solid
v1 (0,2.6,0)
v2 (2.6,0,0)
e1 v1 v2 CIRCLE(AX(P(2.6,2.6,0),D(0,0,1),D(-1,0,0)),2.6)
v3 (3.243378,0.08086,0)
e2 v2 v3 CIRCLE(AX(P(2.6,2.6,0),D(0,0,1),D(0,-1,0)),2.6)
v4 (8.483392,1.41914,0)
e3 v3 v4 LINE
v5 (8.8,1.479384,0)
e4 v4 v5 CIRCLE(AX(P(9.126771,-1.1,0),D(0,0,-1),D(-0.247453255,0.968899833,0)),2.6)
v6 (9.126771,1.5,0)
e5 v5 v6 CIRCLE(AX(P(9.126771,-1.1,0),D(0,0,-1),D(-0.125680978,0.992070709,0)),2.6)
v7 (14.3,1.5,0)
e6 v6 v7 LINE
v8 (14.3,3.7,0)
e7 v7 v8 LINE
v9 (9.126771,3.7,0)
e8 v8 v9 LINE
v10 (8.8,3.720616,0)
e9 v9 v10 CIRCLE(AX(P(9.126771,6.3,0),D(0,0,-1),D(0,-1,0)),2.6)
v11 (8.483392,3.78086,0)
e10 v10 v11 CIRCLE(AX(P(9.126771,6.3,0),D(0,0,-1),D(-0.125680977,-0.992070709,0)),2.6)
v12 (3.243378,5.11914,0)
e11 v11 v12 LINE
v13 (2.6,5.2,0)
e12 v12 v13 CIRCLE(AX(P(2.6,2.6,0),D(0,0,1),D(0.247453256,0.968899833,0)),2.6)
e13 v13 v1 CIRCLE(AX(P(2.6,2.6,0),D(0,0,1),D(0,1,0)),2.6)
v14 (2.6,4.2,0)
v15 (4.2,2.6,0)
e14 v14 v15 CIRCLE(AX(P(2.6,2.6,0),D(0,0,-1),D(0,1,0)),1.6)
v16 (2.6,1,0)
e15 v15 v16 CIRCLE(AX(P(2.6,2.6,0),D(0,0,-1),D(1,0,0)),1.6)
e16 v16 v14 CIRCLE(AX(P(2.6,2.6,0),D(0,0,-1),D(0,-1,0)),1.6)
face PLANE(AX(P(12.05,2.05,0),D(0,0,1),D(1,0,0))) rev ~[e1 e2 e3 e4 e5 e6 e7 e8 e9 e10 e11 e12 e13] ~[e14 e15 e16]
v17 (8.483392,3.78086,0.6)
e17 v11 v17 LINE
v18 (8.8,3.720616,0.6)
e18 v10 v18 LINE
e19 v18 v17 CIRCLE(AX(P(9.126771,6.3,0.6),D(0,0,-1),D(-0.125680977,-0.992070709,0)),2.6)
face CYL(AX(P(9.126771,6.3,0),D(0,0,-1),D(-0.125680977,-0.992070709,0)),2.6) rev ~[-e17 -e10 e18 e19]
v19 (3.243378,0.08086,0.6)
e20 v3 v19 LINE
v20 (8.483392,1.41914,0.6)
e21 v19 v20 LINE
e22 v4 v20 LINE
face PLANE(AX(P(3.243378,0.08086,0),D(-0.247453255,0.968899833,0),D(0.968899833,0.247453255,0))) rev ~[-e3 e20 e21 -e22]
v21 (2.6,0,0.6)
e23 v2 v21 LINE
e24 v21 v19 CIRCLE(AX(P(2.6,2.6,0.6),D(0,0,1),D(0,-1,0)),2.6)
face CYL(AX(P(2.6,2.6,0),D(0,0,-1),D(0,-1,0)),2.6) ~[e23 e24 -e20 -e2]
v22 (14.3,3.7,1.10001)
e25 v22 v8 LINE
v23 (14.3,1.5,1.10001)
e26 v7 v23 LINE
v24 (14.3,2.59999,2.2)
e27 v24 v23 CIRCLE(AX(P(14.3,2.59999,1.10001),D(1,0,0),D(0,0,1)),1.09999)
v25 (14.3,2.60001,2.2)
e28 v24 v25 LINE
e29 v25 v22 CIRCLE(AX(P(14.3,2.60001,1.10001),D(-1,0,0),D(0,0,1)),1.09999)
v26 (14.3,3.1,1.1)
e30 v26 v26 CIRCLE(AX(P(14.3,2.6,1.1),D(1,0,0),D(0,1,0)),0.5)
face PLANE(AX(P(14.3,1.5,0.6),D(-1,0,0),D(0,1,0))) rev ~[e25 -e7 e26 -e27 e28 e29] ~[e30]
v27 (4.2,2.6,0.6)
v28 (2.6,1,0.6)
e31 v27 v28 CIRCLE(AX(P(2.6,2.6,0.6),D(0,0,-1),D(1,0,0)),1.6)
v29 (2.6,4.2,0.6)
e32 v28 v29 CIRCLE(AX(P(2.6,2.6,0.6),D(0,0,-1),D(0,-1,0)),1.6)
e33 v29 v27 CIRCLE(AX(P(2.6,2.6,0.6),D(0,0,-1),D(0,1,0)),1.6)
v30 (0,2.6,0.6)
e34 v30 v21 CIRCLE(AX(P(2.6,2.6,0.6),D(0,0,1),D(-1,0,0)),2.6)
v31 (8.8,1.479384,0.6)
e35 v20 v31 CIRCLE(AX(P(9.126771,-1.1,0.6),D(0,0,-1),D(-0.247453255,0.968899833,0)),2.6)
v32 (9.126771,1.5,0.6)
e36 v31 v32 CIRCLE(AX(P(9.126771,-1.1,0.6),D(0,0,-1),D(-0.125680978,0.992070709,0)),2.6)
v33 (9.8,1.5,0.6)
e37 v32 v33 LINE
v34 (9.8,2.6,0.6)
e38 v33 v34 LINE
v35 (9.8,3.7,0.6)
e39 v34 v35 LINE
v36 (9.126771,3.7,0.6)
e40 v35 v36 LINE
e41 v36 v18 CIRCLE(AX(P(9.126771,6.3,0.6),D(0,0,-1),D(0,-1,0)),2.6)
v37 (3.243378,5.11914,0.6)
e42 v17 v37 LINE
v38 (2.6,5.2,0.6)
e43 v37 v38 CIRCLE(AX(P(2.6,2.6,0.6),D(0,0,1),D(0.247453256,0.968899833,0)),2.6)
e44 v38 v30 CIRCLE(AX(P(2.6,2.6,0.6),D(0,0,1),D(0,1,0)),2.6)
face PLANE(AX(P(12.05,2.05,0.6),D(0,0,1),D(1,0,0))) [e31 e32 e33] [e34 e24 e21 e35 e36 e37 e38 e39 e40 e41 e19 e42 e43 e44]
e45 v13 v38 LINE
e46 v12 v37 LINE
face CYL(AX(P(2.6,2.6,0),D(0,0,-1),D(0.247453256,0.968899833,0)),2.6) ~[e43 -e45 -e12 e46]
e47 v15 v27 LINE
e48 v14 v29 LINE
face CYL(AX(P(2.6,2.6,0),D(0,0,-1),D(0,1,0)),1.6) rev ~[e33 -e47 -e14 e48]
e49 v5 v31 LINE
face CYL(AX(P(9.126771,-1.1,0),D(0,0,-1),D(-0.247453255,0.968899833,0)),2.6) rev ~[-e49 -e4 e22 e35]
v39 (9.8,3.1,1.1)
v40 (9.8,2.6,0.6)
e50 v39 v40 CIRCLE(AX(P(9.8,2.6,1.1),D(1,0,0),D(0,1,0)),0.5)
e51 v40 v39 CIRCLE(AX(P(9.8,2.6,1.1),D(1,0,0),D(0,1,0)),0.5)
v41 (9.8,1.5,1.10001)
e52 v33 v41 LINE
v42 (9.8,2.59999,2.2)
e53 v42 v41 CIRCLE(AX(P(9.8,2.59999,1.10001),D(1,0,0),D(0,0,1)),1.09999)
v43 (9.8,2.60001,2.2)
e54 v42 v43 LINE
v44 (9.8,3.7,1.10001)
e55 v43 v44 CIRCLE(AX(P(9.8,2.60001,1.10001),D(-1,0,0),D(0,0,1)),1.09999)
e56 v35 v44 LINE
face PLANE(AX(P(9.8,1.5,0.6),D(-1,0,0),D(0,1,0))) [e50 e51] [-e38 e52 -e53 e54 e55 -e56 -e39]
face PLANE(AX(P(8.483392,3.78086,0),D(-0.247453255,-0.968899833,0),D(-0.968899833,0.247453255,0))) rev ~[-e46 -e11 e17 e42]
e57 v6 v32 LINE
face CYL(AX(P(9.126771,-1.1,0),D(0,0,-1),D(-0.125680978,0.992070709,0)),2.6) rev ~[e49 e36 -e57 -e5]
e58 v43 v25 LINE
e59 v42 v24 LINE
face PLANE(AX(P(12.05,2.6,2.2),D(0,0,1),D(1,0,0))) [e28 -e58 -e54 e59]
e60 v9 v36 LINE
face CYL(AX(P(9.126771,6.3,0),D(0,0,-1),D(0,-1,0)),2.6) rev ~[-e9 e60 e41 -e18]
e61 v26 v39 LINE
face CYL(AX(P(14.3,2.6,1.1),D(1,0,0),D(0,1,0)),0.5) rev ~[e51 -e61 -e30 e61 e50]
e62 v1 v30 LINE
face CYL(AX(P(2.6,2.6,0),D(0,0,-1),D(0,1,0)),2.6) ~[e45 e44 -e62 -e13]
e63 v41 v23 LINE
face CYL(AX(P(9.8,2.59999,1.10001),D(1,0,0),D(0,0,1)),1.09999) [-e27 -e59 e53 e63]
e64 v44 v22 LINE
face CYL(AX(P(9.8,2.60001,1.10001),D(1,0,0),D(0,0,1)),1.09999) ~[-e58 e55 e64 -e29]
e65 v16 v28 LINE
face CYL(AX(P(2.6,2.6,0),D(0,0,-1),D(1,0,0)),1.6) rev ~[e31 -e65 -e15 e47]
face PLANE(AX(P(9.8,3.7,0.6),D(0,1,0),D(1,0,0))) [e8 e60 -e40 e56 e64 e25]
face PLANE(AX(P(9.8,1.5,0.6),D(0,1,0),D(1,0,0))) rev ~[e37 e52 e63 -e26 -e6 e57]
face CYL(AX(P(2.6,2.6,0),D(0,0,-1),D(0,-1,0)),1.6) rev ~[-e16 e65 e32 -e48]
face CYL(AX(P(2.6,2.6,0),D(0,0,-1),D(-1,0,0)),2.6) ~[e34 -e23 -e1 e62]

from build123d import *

# Parameters (mm, degrees)
F0_W     = 4.5
F0_H     = 1.1
F1_DEPTH = 0.6
F2_W     = 4.5
F2_H     = 2.2
F3_DEPTH = 1.6
F4_R     = 1.09999
F5_R     = 0.5
F6_DEPTH = 25


# Not quite as in the source:
# - a fillet or chamfer is up to 0.001 mm smaller than in the source, because OpenCascade refuses the exact size


with BuildPart() as f1:
    # F0 (on Top) → F1 (new body)
    with BuildSketch(Plane.XY):
        with Locations((12.05, 2.05)):
            Rectangle(F0_W, F0_H)
        with Locations((12.05, 3.15)):
            Rectangle(F0_W, F0_H)
        with BuildLine():
            Line((9.1267705413, 1.5), (9.8, 1.5))
            Line((9.8, 1.5), (9.8, 2.6))
            Line((9.8, 2.6), (8.8, 2.6))
            Line((8.8, 2.6), (8.8, 1.4793838437))
            ThreePointArc((8.8, 1.4793838437), (8.9630604221, 1.4948408423), (9.1267705413, 1.5))
        make_face()
        with BuildLine():
            Line((8.8, 2.6), (9.8, 2.6))
            Line((9.8, 2.6), (9.8, 3.7))
            Line((9.8, 3.7), (9.1267705413, 3.7))
            ThreePointArc((9.1267705413, 3.7), (8.9630604221, 3.7051591577), (8.8, 3.7206161563))
            Line((8.8, 3.7206161563), (8.8, 2.6))
        make_face()
        with BuildLine():
            Line((8.8, 1.4793838437), (8.8, 2.6))
            Line((8.8, 2.6), (8.8, 3.7206161563))
            ThreePointArc((8.8, 3.7206161563), (8.6407616767, 3.7458278477), (8.4833920771, 3.7808604342))
            Line((8.4833920771, 3.7808604342), (3.2433784641, 5.1191395658))
            ThreePointArc((3.2433784641, 5.1191395658), (2.9242199323, 5.1797056878), (2.6, 5.2))
            Line((2.6, 5.2), (2.6, 4.2))
            ThreePointArc((2.6, 4.2), (3.7313708499, 3.7313708499), (4.2, 2.6))
            ThreePointArc((4.2, 2.6), (3.7313708499, 1.4686291501), (2.6, 1))
            Line((2.6, 1), (2.6, 0))
            ThreePointArc((2.6, 0), (2.9242199323, 0.0202943122), (3.2433784641, 0.0808604342))
            Line((3.2433784641, 0.0808604342), (8.4833920771, 1.4191395658))
            ThreePointArc((8.4833920771, 1.4191395658), (8.6407616767, 1.4541721523), (8.8, 1.4793838437))
        make_face()
        with BuildLine():
            ThreePointArc((0, 2.6), (0.7615223689, 0.7615223689), (2.6, 0))
            Line((2.6, 0), (2.6, 1))
            ThreePointArc((2.6, 1), (1, 2.6), (2.6, 4.2))
            Line((2.6, 4.2), (2.6, 5.2))
            ThreePointArc((2.6, 5.2), (0.7615223689, 4.4384776311), (0, 2.6))
        make_face()
    extrude(amount=F1_DEPTH)

    # F2 (on face) → F3 (join)
    with BuildSketch(Plane.XY.offset(0.6)):
        with Locations((12.05, 2.6)):
            Rectangle(F2_W, F2_H)
    extrude(amount=F3_DEPTH)

    # F4 (radius 1.1 in the source; OpenCascade refuses exactly that, so slightly less here)
    f4_edges = [f1.edges().sort_by_distance(p)[0] for p in [
        (12.05, 1.5, 2.2),
        (12.05, 3.7, 2.2),
    ]]
    fillet(f4_edges, radius=F4_R)

    # F5 (on face) → F6 (cut)
    with BuildSketch(Plane.YZ.offset(14.3)):
        with Locations((2.6, 1.1)):
            Circle(F5_R)
    extrude(amount=-F6_DEPTH, mode=Mode.SUBTRACT)


solid = f1.part
